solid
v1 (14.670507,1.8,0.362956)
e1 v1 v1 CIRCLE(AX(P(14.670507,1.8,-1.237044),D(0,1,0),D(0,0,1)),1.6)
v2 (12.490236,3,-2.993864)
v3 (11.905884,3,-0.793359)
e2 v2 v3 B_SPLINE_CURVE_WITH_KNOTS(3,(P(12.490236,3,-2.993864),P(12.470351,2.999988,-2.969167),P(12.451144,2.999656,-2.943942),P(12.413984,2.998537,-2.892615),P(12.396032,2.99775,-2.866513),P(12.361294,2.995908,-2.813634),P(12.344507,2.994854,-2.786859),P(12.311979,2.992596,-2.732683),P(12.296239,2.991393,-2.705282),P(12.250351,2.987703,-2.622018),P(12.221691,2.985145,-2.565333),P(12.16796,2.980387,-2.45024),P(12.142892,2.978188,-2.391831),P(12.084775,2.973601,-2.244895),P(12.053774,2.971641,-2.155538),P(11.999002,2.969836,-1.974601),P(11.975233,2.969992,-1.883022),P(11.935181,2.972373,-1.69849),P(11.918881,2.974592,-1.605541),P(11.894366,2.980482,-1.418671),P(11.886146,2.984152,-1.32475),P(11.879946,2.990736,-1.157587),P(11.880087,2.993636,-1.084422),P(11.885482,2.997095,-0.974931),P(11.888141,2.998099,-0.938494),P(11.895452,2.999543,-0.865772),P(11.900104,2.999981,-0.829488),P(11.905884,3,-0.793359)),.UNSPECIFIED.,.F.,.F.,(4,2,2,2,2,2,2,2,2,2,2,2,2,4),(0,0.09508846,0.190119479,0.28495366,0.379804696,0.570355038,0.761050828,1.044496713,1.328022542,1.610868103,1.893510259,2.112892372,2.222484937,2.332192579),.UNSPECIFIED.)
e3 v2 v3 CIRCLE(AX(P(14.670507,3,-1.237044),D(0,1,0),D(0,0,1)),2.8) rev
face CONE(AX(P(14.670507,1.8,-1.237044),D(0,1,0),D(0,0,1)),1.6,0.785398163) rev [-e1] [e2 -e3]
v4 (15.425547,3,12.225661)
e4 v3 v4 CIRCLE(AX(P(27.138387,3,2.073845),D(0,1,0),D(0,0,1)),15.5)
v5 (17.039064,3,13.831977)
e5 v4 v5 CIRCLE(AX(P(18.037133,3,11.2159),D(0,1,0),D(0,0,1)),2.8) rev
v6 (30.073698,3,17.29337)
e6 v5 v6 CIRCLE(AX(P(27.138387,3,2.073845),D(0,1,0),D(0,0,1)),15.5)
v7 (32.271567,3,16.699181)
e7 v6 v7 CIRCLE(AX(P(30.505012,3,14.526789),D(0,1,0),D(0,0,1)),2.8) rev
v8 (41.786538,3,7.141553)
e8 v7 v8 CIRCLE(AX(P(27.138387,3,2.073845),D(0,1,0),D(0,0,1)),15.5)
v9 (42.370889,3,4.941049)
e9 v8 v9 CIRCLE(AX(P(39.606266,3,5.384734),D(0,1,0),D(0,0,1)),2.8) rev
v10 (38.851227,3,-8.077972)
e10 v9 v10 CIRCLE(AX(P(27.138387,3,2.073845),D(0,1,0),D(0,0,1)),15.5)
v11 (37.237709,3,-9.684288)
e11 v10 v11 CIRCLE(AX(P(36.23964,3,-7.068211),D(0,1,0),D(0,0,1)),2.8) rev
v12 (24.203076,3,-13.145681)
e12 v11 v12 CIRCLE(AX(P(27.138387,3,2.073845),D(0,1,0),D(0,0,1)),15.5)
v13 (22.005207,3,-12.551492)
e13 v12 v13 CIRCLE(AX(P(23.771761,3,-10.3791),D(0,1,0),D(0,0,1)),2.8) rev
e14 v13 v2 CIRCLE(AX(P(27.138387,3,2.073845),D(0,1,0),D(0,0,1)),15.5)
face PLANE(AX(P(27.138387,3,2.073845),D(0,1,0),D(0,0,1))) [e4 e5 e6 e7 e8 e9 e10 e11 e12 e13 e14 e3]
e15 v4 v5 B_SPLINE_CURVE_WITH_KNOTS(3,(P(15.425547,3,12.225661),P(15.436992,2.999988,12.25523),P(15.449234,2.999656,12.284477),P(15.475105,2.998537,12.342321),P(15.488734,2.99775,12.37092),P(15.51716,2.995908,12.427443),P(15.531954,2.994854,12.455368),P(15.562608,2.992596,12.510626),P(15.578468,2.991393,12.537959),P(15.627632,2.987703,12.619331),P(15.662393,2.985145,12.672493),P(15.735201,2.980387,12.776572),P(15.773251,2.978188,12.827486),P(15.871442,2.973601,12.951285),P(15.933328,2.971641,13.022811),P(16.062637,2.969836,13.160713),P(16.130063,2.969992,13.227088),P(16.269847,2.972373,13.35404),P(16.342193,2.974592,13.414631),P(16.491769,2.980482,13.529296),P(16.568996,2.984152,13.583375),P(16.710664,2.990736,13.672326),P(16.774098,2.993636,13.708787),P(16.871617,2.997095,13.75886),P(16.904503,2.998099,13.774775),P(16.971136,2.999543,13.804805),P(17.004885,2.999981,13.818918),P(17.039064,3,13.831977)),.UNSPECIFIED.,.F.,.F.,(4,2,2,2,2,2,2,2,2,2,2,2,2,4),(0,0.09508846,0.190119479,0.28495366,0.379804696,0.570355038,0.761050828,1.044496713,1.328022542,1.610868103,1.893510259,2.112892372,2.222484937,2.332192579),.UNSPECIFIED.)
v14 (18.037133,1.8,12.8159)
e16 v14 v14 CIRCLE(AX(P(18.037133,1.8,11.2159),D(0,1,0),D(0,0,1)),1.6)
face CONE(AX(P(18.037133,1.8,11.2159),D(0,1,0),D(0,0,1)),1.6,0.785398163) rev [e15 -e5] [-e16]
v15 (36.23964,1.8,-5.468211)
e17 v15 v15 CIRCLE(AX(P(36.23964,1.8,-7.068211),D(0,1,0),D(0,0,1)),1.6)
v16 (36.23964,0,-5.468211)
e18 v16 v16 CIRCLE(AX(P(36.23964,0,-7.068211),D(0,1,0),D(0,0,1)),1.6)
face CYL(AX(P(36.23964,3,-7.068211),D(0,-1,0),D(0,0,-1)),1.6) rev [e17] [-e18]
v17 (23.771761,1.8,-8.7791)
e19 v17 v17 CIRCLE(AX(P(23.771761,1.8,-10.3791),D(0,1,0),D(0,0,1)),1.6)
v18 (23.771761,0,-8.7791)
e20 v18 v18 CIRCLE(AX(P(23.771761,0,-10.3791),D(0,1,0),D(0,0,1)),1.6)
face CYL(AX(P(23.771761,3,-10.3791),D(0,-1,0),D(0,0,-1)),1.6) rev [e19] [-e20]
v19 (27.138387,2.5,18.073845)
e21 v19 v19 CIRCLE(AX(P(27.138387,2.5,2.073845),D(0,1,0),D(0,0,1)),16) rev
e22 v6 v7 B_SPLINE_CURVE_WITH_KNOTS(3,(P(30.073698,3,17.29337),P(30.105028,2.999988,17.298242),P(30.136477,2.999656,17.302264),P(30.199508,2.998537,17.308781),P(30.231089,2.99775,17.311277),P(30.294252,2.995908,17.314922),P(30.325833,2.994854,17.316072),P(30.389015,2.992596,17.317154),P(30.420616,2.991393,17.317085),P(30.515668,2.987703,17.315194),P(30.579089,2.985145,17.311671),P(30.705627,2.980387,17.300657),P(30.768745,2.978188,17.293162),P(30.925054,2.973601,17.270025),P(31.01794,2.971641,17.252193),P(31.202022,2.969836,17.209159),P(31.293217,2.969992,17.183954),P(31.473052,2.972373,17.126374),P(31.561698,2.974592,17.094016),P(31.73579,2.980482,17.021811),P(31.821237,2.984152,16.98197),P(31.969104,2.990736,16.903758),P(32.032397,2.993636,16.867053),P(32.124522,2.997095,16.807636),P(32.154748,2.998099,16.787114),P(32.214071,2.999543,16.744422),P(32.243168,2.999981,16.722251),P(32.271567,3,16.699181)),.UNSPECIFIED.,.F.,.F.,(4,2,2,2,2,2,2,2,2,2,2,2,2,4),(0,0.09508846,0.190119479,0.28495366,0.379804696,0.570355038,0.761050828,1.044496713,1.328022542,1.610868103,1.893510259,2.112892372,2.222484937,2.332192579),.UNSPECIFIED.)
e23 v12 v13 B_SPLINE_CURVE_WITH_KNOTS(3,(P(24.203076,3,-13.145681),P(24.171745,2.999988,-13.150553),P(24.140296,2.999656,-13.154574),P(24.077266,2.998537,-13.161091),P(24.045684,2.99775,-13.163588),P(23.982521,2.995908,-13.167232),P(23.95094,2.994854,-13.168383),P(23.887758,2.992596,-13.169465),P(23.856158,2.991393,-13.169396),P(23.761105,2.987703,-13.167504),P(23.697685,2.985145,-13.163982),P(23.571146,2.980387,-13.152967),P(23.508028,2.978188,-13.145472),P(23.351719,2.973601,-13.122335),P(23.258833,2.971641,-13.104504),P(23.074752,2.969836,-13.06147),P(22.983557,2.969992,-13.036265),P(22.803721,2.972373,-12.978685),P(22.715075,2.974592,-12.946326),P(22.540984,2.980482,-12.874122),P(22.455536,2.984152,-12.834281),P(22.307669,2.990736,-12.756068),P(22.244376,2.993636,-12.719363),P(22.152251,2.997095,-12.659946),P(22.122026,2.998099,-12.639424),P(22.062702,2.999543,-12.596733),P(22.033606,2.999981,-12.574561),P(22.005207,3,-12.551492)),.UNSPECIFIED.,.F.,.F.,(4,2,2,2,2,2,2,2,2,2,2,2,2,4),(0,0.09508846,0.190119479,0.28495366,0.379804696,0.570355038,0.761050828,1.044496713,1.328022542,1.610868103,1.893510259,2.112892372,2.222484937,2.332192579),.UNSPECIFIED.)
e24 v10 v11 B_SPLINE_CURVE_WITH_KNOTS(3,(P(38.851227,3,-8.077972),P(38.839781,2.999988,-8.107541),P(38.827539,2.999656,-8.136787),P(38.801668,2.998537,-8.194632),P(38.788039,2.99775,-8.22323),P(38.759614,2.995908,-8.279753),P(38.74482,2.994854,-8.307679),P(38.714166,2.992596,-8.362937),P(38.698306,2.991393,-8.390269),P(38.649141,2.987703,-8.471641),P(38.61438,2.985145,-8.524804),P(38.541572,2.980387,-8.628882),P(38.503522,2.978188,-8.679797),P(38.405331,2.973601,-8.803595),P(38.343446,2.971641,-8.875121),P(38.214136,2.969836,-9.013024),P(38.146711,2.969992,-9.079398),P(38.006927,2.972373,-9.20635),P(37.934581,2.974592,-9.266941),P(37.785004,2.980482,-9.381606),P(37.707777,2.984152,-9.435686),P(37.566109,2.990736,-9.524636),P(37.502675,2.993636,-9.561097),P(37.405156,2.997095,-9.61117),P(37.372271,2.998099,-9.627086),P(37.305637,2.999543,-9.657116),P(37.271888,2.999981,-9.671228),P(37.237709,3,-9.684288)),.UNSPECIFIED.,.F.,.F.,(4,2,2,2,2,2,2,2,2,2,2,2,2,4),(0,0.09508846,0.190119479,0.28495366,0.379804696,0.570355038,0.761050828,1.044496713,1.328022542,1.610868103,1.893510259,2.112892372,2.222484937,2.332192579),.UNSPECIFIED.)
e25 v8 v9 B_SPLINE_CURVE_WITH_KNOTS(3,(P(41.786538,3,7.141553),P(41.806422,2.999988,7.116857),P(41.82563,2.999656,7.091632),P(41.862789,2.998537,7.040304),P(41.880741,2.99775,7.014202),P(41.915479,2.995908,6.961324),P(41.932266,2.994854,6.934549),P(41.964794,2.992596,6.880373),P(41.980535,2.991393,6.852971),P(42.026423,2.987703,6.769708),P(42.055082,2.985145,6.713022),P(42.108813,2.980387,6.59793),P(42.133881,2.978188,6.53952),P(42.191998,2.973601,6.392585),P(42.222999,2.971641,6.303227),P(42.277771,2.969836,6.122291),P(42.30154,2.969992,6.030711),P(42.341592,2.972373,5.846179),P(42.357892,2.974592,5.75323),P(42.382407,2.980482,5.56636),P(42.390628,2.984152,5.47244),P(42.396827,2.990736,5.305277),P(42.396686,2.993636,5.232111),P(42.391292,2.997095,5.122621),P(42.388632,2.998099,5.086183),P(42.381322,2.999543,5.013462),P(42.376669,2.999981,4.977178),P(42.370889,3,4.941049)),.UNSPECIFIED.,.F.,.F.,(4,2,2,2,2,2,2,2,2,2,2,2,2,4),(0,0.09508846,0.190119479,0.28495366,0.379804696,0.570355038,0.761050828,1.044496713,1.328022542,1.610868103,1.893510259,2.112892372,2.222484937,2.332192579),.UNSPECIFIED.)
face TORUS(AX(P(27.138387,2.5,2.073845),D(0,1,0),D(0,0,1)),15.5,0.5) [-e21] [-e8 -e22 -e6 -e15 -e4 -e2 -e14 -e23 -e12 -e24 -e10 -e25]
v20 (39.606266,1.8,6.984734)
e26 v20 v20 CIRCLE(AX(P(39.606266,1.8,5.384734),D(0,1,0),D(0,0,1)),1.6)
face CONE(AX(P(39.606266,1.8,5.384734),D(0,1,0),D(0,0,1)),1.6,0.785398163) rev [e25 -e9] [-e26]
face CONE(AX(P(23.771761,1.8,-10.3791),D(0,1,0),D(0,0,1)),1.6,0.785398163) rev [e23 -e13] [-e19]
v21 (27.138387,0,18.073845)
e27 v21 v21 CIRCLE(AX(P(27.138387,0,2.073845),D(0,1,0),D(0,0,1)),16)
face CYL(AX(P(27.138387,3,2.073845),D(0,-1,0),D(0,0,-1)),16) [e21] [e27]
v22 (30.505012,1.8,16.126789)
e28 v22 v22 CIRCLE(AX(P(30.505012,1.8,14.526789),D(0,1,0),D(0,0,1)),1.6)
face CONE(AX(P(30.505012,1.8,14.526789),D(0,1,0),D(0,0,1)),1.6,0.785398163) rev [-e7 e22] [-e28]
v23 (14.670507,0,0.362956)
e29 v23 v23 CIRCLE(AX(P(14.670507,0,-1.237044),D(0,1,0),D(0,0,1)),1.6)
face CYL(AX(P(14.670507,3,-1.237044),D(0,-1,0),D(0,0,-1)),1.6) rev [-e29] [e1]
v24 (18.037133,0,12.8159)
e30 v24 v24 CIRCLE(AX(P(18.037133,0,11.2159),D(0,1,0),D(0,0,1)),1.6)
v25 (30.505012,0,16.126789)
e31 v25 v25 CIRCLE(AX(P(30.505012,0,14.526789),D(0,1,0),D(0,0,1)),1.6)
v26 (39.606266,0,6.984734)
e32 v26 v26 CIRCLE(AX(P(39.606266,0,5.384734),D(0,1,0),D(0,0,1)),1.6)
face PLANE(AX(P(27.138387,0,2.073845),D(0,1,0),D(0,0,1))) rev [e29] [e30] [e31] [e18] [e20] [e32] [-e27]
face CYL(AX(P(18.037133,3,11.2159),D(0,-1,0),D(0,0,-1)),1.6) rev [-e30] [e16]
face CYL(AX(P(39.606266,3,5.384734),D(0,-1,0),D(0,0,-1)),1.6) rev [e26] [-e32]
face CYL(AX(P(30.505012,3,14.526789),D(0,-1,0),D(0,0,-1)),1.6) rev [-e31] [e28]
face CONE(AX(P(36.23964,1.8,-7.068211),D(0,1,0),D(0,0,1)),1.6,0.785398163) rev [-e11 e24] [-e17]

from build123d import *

# Parameters (mm, degrees)
SKETCH1_R           = 16
SKETCH1_R_2         = 1.6
BOSS_EXTRUDE1_DEPTH = 3
CHAMFER1_SIZE       = 1.2
FILLET1_R           = 0.5


with BuildPart() as part:
    # Sketch1 → Boss-Extrude1 (new body)
    with BuildSketch(Plane(origin=(0, 0, 0), x_dir=(1, 0, 0), z_dir=(0, 1, 0))):
        with Locations(Location((27.13838664, -2.073844751, 0), (0, 0, 270))):
            Circle(SKETCH1_R)
        with Locations(Location((23.771761103, 10.379099981, 0), (0, 0, 270))):
            Circle(SKETCH1_R_2, mode=Mode.SUBTRACT)
        with Locations(Location((36.239640361, 7.068210855, 0), (0, 0, 270))):
            Circle(SKETCH1_R_2, mode=Mode.SUBTRACT)
        with Locations(Location((39.606265898, -5.384733876, 0), (0, 0, 270))):
            Circle(SKETCH1_R_2, mode=Mode.SUBTRACT)
        with Locations(Location((30.505012177, -14.526789483, 0), (0, 0, 270))):
            Circle(SKETCH1_R_2, mode=Mode.SUBTRACT)
        with Locations(Location((18.037132919, -11.215900357, 0), (0, 0, 270))):
            Circle(SKETCH1_R_2, mode=Mode.SUBTRACT)
        with Locations(Location((14.670507382, 1.237044374, 0), (0, 0, 270))):
            Circle(SKETCH1_R_2, mode=Mode.SUBTRACT)
    extrude(amount=BOSS_EXTRUDE1_DEPTH)

    # Chamfer1
    chamfer1_edges = [part.edges().sort_by_distance(p)[0] for p in [
        (39.606265898, 3, 3.784733876),
        (30.505012177, 3, 12.926789483),
        (18.037132919, 3, 9.615900357),
        (14.670507382, 3, -2.837044374),
        (23.771761103, 3, -11.979099981),
        (36.239640361, 3, -8.668210855),
    ]]
    chamfer(chamfer1_edges, length=CHAMFER1_SIZE)

    # Fillet1
    # the kernel refuses this fillet: 0.5 mm, written as the material it takes off along each edge
    with BuildSketch(Plane(origin=(27.13838664, 3, 2.073844751), x_dir=(0, 0, 1), z_dir=(-1, 0, 0))) as fillet1_piece_1:
        with BuildLine():
            CenterArc((16 - FILLET1_R, -FILLET1_R), FILLET1_R, 0, 90)
            Line((16, -FILLET1_R), (16, 0))
            Line((16, 0), (16 - FILLET1_R, 0))
        make_face()
    revolve(axis=Axis((27.13838664, 3, 2.073844751), (0, 1, 0)), mode=Mode.SUBTRACT)


solid = part.part
